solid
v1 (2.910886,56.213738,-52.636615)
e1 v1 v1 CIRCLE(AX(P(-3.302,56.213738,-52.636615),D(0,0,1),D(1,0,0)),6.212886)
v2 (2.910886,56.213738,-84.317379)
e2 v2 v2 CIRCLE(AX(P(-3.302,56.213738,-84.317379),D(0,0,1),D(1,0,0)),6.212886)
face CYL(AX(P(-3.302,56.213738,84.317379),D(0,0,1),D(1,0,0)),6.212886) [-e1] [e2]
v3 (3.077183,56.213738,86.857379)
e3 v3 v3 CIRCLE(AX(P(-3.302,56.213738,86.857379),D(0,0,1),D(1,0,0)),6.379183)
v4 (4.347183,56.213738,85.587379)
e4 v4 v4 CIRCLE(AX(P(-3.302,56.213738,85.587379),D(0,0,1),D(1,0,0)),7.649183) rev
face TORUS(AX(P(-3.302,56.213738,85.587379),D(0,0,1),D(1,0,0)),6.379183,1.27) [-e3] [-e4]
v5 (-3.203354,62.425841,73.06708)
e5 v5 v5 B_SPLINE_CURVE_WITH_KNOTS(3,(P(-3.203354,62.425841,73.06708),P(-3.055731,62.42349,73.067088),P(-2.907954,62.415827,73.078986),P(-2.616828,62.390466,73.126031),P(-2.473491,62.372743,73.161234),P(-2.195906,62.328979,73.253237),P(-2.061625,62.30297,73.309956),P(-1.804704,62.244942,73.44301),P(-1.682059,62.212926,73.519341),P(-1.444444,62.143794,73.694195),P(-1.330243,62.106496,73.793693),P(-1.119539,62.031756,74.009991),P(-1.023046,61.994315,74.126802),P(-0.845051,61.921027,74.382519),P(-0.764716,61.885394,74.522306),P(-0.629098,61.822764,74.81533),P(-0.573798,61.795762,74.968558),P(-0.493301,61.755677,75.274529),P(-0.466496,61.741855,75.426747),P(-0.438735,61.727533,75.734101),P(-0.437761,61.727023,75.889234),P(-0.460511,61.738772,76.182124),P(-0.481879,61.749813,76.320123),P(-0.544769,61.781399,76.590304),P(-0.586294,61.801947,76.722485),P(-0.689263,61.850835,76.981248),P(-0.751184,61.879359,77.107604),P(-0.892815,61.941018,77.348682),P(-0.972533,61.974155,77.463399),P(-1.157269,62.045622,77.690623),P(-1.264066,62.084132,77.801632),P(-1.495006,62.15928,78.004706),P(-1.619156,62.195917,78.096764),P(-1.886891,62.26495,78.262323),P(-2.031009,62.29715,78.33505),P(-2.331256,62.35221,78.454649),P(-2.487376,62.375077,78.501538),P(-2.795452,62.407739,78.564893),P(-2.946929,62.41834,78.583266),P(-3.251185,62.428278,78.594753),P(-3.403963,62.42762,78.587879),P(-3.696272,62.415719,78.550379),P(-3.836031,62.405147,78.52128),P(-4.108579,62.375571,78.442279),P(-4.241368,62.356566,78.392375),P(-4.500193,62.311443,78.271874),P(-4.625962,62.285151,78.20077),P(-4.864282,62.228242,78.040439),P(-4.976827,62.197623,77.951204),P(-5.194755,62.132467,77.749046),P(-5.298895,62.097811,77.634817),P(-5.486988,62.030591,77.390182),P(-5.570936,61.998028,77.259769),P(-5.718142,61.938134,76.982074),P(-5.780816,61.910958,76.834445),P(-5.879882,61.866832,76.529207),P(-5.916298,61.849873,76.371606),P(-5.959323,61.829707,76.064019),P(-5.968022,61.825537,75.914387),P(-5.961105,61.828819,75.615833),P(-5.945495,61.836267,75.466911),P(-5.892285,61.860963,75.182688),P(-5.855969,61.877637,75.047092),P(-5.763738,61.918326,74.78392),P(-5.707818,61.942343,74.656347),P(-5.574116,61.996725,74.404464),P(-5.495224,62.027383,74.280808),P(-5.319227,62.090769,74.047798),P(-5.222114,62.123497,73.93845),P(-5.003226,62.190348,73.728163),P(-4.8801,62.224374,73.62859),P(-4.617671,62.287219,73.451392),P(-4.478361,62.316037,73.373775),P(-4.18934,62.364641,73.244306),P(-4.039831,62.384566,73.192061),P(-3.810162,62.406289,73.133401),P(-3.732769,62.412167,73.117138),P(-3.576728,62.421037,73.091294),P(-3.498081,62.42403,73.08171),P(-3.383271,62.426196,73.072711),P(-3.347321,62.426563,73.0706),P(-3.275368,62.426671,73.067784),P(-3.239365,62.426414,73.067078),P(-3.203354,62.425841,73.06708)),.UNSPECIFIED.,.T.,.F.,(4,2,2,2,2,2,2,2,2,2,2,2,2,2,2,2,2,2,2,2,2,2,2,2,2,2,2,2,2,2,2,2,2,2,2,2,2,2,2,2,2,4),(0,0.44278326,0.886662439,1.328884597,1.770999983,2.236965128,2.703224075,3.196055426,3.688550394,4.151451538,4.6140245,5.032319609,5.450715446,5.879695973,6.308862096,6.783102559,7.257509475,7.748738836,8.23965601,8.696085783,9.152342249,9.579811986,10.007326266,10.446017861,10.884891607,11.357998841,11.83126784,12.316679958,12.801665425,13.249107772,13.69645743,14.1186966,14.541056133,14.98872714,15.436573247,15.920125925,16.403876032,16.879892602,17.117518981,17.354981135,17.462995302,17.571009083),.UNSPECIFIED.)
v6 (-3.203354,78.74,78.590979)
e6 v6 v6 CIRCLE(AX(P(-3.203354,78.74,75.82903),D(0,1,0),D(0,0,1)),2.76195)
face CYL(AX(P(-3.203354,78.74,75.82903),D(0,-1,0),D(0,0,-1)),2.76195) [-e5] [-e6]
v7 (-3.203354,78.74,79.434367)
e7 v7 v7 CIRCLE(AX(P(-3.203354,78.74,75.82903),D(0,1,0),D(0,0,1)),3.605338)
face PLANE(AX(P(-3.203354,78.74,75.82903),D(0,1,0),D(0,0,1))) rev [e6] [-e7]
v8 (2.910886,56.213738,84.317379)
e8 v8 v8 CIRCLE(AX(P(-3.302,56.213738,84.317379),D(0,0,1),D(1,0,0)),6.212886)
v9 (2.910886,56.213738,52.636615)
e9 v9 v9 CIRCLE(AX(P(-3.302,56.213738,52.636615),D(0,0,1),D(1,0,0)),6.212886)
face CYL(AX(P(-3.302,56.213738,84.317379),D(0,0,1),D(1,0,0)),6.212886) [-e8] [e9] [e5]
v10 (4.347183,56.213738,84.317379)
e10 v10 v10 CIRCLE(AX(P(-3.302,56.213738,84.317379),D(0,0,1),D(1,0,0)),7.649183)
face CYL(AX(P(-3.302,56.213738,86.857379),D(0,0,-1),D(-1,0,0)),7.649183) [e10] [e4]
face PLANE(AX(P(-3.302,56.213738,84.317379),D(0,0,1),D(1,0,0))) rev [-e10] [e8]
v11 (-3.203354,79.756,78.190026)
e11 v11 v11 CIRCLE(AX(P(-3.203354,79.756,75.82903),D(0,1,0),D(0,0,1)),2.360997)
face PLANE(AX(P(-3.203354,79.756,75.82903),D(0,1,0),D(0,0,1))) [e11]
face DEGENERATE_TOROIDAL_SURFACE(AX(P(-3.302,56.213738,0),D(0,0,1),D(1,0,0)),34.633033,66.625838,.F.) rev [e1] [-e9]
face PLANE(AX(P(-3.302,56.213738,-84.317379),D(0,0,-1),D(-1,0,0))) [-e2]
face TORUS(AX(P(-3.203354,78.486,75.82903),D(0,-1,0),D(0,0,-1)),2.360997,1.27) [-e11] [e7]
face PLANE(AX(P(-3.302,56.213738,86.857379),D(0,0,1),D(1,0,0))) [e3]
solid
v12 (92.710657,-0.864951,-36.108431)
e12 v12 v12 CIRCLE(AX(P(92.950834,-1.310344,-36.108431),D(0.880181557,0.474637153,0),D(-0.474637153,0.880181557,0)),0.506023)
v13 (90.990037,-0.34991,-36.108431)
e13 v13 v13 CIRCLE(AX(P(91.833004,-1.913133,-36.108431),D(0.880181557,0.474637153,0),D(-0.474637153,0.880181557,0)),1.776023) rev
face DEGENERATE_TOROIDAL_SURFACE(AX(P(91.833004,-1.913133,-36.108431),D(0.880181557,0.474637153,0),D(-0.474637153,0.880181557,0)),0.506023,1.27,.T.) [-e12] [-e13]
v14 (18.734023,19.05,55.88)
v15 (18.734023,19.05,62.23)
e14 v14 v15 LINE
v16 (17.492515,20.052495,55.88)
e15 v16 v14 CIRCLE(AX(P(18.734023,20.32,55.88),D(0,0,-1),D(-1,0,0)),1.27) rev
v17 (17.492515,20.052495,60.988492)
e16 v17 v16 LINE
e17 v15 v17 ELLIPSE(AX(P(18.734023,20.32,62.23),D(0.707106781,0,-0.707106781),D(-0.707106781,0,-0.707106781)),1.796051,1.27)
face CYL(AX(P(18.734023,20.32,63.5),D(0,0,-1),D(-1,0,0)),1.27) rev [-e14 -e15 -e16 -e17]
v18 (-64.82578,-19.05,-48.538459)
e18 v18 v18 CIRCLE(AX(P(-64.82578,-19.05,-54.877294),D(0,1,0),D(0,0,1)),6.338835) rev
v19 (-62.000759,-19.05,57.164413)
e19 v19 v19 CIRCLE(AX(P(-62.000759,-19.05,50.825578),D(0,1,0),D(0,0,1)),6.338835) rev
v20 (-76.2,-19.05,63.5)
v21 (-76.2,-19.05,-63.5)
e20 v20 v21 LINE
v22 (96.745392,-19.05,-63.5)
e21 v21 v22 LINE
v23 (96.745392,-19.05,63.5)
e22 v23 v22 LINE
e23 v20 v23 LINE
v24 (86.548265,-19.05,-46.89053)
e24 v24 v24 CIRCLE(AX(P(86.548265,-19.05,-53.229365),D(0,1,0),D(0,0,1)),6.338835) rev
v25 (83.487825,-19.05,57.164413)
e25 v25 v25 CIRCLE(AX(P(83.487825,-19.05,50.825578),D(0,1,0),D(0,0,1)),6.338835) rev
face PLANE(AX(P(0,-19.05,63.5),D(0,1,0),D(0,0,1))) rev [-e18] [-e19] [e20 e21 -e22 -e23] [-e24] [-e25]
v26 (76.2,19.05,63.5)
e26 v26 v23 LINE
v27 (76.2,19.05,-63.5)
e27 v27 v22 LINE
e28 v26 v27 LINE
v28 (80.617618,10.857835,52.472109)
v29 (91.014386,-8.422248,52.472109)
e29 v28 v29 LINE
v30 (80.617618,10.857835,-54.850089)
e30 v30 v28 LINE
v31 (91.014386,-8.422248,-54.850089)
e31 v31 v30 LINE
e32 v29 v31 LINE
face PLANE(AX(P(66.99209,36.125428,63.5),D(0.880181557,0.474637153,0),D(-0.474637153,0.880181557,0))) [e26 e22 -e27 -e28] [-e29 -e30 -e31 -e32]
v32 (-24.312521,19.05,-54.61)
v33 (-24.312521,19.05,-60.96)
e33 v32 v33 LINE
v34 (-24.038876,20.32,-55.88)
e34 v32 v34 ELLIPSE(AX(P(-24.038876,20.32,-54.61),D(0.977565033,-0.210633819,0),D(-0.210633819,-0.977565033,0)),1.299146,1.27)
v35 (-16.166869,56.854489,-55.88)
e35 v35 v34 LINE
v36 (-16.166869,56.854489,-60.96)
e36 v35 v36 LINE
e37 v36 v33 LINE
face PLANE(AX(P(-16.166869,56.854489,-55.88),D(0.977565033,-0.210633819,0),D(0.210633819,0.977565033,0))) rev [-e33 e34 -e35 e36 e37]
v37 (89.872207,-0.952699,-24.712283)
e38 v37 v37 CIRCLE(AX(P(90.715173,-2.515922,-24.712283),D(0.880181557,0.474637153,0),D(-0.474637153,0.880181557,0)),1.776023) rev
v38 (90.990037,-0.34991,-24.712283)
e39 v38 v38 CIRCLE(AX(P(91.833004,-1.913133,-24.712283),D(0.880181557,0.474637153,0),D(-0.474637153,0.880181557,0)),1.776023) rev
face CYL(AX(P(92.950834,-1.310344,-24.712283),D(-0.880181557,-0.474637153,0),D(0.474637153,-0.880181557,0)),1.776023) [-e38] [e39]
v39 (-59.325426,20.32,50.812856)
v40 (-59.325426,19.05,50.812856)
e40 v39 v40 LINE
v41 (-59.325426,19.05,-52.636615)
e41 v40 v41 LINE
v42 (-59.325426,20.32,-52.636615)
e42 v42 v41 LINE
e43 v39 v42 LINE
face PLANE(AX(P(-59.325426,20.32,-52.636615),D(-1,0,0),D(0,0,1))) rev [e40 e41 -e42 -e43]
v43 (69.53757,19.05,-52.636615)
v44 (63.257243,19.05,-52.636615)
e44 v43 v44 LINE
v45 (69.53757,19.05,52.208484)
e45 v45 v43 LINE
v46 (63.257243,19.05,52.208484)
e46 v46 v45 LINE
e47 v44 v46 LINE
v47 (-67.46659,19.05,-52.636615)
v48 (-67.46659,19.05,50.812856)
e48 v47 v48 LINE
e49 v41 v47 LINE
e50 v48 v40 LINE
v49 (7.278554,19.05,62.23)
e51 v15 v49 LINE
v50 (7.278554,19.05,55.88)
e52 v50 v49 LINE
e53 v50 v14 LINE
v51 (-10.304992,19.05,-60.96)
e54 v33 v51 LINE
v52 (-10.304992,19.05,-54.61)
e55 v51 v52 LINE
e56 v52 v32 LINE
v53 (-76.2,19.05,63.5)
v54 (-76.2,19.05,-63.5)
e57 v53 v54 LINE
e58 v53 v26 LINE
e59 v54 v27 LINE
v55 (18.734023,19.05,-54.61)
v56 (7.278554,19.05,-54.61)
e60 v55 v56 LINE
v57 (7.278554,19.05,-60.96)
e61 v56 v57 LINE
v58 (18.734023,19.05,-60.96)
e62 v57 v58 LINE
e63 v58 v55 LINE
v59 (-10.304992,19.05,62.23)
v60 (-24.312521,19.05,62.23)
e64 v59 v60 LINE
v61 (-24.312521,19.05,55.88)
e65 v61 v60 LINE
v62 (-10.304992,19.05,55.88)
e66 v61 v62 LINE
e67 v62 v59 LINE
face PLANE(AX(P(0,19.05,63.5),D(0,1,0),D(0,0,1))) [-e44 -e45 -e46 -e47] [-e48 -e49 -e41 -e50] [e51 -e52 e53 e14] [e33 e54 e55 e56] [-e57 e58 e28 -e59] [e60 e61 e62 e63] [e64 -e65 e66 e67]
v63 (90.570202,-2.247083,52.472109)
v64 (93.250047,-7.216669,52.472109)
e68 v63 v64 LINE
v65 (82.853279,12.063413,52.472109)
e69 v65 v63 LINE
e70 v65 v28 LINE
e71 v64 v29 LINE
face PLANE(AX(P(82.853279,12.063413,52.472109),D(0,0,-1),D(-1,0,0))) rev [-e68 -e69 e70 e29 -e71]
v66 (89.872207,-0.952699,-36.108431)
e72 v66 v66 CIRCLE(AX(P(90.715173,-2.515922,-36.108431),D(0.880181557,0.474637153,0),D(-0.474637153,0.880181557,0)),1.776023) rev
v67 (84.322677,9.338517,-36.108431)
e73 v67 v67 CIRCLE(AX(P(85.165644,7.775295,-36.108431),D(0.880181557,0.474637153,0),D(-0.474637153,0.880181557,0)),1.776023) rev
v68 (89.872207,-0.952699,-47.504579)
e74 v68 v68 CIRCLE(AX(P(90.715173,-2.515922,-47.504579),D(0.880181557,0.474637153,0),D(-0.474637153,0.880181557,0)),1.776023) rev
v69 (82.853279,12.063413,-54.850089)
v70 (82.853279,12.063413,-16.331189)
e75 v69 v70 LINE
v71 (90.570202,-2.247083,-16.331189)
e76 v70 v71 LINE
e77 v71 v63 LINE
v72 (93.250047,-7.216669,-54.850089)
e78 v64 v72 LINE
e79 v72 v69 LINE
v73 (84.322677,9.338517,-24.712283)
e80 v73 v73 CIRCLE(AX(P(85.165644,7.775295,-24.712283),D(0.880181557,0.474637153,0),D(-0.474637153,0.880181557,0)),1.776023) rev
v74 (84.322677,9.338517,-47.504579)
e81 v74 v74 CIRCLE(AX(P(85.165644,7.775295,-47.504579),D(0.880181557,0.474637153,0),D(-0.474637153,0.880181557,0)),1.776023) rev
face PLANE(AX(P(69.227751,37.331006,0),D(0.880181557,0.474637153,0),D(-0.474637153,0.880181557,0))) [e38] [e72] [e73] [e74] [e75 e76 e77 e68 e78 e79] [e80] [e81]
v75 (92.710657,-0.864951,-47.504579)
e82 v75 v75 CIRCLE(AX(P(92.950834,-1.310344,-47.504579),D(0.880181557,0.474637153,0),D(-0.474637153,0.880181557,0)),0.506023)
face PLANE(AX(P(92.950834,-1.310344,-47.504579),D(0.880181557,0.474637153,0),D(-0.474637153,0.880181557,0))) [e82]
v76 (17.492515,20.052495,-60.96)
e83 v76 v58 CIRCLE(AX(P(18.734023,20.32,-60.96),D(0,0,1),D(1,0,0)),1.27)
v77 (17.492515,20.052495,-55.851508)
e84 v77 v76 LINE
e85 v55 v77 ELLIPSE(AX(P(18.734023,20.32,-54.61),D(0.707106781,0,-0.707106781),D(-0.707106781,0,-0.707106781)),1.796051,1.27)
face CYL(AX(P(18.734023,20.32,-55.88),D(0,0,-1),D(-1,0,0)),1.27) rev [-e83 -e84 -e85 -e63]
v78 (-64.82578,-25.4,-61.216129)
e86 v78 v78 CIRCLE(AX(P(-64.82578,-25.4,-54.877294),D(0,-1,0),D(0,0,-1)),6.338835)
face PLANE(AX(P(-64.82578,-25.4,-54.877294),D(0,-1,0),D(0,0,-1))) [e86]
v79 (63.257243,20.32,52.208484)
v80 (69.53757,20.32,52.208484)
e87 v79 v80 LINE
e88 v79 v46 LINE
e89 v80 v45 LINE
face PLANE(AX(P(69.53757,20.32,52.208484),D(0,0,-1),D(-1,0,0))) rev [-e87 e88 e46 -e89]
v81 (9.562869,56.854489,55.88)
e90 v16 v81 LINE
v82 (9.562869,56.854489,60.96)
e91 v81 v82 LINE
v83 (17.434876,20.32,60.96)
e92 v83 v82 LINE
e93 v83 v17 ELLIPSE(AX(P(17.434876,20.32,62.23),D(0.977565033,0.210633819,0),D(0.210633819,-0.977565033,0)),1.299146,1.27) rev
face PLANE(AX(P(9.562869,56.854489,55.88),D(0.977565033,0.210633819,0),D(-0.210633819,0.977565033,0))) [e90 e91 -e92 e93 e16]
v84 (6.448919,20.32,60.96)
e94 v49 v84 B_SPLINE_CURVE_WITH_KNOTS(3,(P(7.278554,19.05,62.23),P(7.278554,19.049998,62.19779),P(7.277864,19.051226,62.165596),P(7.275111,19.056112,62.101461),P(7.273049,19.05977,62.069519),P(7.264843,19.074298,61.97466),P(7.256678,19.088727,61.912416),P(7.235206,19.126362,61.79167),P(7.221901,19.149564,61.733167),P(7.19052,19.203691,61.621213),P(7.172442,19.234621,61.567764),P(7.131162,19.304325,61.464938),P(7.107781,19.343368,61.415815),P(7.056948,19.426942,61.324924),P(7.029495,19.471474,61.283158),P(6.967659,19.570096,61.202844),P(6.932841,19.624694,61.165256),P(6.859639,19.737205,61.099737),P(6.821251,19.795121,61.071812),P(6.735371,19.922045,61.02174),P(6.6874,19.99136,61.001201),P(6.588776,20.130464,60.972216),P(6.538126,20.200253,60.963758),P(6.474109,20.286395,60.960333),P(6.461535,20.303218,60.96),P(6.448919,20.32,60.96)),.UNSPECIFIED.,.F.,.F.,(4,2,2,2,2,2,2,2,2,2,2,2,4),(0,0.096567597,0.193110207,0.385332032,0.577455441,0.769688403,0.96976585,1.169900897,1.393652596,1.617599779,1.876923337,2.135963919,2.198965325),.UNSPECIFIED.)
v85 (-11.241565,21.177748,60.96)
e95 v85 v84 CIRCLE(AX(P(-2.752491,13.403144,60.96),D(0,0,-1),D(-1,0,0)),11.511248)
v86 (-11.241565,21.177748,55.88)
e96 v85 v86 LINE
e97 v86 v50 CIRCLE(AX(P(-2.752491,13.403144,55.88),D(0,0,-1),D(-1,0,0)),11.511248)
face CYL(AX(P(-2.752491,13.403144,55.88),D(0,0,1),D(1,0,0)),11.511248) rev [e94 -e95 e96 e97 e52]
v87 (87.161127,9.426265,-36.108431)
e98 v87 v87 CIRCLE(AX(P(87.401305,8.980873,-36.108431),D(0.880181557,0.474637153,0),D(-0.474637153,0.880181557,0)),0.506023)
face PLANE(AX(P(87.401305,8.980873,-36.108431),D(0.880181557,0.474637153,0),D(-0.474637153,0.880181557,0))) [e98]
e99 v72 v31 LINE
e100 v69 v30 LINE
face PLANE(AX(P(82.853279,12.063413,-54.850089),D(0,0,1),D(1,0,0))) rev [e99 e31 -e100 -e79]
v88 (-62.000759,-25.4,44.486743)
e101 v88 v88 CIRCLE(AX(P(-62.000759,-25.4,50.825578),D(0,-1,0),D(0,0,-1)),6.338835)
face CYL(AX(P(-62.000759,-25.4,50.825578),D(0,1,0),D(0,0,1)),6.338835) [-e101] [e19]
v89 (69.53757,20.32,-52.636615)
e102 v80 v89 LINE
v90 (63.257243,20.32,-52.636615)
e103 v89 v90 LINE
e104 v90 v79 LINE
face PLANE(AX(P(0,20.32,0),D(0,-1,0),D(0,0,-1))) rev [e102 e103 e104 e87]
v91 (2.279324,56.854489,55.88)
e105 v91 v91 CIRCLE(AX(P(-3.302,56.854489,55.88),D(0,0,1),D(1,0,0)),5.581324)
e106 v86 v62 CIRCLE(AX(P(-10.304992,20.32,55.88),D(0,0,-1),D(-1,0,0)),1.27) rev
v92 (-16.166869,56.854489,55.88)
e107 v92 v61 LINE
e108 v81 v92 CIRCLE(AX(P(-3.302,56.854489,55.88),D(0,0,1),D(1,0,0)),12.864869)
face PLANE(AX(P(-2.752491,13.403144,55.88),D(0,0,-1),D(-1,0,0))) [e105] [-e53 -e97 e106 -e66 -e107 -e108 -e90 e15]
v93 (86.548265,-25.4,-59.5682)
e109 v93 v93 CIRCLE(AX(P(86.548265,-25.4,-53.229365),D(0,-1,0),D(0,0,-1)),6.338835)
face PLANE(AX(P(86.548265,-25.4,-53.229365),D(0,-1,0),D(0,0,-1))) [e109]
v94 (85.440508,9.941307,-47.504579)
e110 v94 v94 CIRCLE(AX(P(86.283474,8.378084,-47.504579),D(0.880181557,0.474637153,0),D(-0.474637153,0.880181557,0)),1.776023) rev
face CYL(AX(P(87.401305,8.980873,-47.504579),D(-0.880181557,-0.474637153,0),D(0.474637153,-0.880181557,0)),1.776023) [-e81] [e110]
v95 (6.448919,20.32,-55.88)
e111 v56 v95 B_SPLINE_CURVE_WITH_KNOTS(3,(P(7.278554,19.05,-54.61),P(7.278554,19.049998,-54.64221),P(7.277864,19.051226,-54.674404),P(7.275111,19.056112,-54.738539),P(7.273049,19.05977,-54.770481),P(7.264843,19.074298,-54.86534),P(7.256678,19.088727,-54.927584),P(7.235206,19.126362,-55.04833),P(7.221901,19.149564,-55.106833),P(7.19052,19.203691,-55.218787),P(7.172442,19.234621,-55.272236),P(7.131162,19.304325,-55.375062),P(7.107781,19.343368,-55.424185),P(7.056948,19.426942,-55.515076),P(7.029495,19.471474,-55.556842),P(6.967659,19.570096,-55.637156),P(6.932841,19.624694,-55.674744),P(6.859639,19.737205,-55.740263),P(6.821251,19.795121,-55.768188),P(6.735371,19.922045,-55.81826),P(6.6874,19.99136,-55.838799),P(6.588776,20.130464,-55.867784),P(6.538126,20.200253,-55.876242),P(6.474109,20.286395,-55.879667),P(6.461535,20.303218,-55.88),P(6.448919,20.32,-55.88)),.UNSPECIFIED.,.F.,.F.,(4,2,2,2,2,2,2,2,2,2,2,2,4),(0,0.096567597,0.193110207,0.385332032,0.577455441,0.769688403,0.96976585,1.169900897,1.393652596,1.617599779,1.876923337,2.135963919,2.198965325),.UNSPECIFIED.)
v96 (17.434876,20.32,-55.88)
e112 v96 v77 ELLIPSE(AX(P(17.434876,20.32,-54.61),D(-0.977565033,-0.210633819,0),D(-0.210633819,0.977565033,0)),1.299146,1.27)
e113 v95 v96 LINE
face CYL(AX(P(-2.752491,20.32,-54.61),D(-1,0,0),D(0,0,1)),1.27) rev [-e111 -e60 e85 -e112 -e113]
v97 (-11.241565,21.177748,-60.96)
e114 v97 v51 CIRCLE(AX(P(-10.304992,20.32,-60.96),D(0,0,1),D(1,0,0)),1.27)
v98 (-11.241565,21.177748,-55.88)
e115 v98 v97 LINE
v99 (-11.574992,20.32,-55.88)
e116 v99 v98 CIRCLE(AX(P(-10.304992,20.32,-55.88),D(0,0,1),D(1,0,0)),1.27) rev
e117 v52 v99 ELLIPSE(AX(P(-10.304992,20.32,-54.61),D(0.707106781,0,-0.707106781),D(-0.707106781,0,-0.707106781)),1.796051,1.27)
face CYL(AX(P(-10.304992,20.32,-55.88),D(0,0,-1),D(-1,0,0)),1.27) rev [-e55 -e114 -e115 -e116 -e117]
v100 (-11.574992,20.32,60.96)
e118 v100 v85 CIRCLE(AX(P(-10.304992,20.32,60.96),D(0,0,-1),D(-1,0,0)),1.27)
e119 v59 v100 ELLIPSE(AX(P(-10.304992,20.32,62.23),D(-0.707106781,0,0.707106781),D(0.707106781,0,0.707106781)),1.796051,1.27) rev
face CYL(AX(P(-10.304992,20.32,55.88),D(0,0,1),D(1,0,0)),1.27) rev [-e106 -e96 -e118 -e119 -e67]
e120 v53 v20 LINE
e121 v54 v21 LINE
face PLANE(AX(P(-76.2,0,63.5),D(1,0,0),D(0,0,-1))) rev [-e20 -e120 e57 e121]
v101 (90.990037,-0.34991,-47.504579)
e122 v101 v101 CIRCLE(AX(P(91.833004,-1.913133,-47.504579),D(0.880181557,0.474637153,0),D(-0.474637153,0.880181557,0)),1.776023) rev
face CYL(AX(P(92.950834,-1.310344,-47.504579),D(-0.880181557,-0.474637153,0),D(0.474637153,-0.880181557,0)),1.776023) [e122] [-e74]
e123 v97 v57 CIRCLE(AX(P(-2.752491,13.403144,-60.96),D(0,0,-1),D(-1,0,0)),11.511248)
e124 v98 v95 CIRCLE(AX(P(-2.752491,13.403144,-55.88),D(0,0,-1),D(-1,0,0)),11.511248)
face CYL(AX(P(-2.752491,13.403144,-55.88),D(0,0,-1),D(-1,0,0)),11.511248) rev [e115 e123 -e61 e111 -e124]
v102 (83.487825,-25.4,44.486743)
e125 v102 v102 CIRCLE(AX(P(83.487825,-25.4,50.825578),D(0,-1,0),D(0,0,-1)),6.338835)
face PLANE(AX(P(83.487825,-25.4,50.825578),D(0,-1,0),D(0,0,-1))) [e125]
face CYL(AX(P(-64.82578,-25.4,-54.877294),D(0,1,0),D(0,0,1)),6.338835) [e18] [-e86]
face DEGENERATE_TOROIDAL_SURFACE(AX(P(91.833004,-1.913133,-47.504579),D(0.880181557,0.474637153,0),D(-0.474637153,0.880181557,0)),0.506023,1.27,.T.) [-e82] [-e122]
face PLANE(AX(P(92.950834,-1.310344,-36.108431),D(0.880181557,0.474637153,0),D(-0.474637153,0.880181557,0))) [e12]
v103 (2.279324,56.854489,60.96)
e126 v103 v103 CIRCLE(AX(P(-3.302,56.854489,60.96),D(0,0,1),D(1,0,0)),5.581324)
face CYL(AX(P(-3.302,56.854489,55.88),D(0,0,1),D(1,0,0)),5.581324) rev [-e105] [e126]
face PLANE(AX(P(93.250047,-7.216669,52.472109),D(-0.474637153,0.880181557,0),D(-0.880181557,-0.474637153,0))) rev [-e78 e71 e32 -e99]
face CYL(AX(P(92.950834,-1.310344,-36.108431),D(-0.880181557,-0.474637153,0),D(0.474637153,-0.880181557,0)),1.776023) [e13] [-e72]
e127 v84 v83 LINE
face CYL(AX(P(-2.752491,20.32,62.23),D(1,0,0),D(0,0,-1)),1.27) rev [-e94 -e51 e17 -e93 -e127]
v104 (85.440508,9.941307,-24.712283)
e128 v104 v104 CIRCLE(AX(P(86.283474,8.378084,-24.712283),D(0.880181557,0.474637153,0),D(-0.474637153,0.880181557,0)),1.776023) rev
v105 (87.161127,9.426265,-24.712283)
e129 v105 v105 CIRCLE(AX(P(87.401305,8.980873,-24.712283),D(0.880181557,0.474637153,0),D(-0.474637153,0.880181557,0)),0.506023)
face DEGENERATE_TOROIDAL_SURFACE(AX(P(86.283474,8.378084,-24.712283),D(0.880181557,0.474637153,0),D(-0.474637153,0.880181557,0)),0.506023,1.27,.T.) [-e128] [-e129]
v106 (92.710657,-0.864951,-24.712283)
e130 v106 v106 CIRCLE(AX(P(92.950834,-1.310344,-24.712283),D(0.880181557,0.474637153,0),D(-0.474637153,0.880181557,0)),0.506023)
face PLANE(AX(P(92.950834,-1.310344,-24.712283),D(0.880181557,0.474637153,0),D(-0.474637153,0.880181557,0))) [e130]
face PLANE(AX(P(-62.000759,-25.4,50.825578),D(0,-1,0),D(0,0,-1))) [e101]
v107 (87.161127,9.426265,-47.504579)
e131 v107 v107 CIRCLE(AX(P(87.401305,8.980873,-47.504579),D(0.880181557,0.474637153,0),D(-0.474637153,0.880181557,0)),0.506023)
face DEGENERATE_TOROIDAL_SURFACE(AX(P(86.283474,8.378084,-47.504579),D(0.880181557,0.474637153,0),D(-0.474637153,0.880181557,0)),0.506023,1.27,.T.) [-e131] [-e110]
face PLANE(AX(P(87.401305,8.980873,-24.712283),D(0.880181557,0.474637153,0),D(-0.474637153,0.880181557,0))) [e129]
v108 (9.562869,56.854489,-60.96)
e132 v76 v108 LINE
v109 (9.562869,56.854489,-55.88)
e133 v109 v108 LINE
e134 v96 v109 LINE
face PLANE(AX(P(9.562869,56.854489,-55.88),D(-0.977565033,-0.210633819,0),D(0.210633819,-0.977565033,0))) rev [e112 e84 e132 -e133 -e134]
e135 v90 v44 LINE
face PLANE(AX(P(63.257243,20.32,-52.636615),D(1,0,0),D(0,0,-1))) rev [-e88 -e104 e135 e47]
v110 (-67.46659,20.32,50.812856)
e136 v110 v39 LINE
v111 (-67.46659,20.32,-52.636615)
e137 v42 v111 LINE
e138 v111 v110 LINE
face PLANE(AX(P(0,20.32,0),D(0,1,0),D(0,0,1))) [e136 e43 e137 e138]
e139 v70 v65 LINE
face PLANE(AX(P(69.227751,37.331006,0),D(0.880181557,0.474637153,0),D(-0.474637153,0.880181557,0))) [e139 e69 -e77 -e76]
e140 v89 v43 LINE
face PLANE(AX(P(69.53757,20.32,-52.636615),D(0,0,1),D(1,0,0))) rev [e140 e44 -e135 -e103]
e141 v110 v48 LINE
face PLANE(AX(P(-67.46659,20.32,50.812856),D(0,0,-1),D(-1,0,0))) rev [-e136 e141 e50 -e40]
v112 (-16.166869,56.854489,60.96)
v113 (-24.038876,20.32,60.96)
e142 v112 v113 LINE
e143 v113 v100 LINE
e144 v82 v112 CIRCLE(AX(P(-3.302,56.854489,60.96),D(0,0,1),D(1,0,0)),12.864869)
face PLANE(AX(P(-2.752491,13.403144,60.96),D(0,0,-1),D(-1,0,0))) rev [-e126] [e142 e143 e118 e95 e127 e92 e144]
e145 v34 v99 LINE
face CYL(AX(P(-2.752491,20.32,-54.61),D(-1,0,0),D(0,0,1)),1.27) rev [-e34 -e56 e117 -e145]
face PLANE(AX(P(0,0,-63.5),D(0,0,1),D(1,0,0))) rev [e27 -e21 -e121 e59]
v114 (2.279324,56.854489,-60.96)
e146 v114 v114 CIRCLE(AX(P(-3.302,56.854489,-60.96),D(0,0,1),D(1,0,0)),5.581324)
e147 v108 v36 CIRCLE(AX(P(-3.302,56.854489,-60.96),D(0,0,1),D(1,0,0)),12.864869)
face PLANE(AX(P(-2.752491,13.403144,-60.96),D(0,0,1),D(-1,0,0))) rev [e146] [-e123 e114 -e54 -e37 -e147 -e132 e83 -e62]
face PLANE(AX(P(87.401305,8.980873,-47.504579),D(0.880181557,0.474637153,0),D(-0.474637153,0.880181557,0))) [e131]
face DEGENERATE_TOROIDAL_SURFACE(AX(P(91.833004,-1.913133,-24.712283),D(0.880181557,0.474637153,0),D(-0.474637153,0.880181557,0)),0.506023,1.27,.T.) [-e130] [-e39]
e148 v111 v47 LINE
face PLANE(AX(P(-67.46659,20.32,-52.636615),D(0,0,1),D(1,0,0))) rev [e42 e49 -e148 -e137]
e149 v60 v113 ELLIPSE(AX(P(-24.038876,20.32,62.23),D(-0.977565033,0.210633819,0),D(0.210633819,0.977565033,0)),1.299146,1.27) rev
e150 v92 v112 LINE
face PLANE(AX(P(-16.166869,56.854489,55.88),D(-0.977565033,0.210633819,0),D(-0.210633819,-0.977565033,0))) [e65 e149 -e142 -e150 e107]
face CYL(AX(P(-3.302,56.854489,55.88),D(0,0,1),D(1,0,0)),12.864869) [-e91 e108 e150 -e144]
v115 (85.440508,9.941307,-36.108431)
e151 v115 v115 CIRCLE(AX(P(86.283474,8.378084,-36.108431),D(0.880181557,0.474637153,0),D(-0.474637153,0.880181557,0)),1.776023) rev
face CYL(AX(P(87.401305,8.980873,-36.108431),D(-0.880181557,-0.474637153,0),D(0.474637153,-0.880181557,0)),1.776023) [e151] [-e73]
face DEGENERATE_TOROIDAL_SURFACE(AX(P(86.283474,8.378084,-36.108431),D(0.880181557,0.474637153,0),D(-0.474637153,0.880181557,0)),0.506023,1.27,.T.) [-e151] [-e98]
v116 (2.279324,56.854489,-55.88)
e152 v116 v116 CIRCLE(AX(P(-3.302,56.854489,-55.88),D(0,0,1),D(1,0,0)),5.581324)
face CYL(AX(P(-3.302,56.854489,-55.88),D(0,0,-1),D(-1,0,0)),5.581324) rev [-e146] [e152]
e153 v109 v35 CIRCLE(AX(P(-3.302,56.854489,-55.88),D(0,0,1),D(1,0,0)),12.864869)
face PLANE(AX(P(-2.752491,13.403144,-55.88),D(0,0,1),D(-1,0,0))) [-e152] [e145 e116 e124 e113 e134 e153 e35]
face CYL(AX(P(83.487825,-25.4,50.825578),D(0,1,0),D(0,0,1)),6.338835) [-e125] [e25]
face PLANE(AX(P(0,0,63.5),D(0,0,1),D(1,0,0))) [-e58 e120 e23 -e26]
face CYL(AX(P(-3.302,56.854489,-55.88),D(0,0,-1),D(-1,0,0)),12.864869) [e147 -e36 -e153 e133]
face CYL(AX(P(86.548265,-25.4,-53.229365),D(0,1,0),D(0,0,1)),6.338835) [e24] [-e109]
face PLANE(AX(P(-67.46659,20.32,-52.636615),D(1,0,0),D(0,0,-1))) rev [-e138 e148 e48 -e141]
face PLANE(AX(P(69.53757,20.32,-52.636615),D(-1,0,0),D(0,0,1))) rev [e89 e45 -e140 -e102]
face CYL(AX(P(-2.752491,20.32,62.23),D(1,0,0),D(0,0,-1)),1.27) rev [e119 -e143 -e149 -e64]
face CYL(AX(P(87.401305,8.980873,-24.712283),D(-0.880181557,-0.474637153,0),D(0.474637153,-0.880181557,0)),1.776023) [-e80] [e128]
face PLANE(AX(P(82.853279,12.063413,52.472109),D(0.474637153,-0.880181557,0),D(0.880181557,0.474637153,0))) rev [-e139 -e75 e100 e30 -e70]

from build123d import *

# Parameters (mm, degrees)
SKETCH1_W           = 152.4
SKETCH1_H           = 38.1
BOSS_EXTRUDE1_DEPTH = 63.5
BOSS_EXTRUDE2_START = -2.54
SKETCH2_R           = 5.581324081
BOSS_EXTRUDE2_DEPTH = 5.08
SKETCH5_R           = 7.649182697
BOSS_EXTRUDE3_DEPTH = 2.54
SKETCH6_W           = 6.28032652
SKETCH6_H           = 104.845098628
SKETCH6_W_2         = 8.141164008
SKETCH6_H_2         = 103.449470512
BOSS_EXTRUDE4_DEPTH = 1.27
SKETCH10_R          = 6.338835005
BOSS_EXTRUDE5_DEPTH = 6.35
SKETCH11_W          = 107.32219814
SKETCH11_H          = 21.904665517
BOSS_EXTRUDE6_DEPTH = 2.54
SKETCH14_R          = 1.776023081
BOSS_EXTRUDE7_DEPTH = 5.08
FILLET2_R           = 1.27
BOSS_EXTRUDE8_START = 55.88
SKETCH15_R          = 2.761949727
BOSS_EXTRUDE8_DEPTH = 22.86
SKETCH16_R          = 3.605337553
BOSS_EXTRUDE9_DEPTH = 1.016
FILLET3_R           = 1.27
FILLET4_R           = 1.27
FILLET5_R           = 1.27


with BuildPart() as part:
    # Sketch1 → Boss-Extrude1 (new, symmetric)
    with BuildSketch(Plane.XY):
        Rectangle(SKETCH1_W, SKETCH1_H)
        Polygon((96.745392491, -19.05), (76.2, -19.05), (76.2, 19.05), align=None)
    extrude(amount=BOSS_EXTRUDE1_DEPTH, both=True)

    # Sketch2 → Boss-Extrude2 (add)
    with BuildSketch(Plane.XY.offset(63.5).offset(BOSS_EXTRUDE2_START)):
        with BuildLine():
            Line((-16.166869298, 19.05), (-12.783535661, 19.05))
            ThreePointArc((-12.783535661, 19.05), (-2.752490883, 24.914392577), (7.278553894, 19.05))
            Line((7.278553894, 19.05), (9.562869298, 19.05))
            Line((9.562869298, 19.05), (17.708520628, 19.05))
            Line((17.708520628, 19.05), (9.562869298, 56.854489091))
            ThreePointArc((9.562869298, 56.854489091), (-3.302, 69.719358389), (-16.166869298, 56.854489091))
            Line((-16.166869298, 56.854489091), (-24.312520628, 19.05))
            Line((-24.312520628, 19.05), (-16.166869298, 19.05))
        make_face()
        with Locations((-3.302, 56.854489091)):
            Circle(SKETCH2_R, mode=Mode.SUBTRACT)
    boss_extrude2 = extrude(amount=-BOSS_EXTRUDE2_DEPTH)

    # Mirror1: Boss-Extrude2 across plane
    add(boss_extrude2.mirror(Plane.XY))

    # Sketch6 → Boss-Extrude4 (add)
    with BuildSketch(Plane(origin=(0, 19.05, 0), x_dir=(1, 0, 0), z_dir=(0, 1, 0))):
        with Locations((66.397406276, 0.214065446)):
            Rectangle(SKETCH6_W, SKETCH6_H)
        with Locations((-63.396008473, 0.911879504)):
            Rectangle(SKETCH6_W_2, SKETCH6_H_2)
    extrude(amount=BOSS_EXTRUDE4_DEPTH)

    # Sketch10 → Boss-Extrude5 (add)
    with BuildSketch(Plane.XZ.offset(19.05)):
        with Locations(Location((-62.000759301, 50.825577826, 0), (0, 0, 90))):
            Circle(SKETCH10_R)
        with Locations(Location((83.487825481, 50.825577826, 0), (0, 0, 90))):
            Circle(SKETCH10_R)
        with Locations(Location((86.548264966, -53.229364688, 0), (0, 0, 90))):
            Circle(SKETCH10_R)
        with Locations(Location((-64.825780365, -54.877293642, 0), (0, 0, 90))):
            Circle(SKETCH10_R)
    extrude(amount=BOSS_EXTRUDE5_DEPTH)

    # Sketch11 → Boss-Extrude6 (add)
    with BuildSketch(Plane(origin=(66.992090278, 36.125427522, 0), x_dir=(0, 0, -1), z_dir=(0.8801815566196112, 0.47463715339897106, 0))):
        with Locations((1.188989576, -39.659583599)):
            Rectangle(SKETCH11_W, SKETCH11_H)
    extrude(amount=BOSS_EXTRUDE6_DEPTH)

    # Sketch14 → Boss-Extrude7 (add)
    with BuildSketch(Plane(origin=(66.992090278, 36.125427522, 0), x_dir=(0, 0, -1), z_dir=(0.8801815566196111, 0.474637153398971, 0))):
        with Locations(Location((24.712283214, -33.579107671, 0), (0, 0, 90))):
            Circle(SKETCH14_R)
        with Locations(Location((36.108431317, -33.579107671, 0), (0, 0, 90))):
            Circle(SKETCH14_R)
        with Locations(Location((47.50457942, -33.579107671, 0), (0, 0, 90))):
            Circle(SKETCH14_R)
        with Locations(Location((24.712283214, -45.271259621, 0), (0, 0, 90))):
            Circle(SKETCH14_R)
        with Locations(Location((36.108431317, -45.271259621, 0), (0, 0, 90))):
            Circle(SKETCH14_R)
        with Locations(Location((47.50457942, -45.271259621, 0), (0, 0, 90))):
            Circle(SKETCH14_R)
    extrude(amount=BOSS_EXTRUDE7_DEPTH)

    # Fillet2
    fillet2_edges = [part.edges().sort_by_distance(p)[0] for p in [
        (88.244271204, 7.417650241, -24.712283214),
        (88.244271204, 7.417650241, -36.108431317),
        (88.244271204, 7.417650241, -47.50457942),
        (93.793800923, -2.873566262, -24.712283214),
        (93.793800923, -2.873566262, -36.108431317),
        (93.793800923, -2.873566262, -47.50457942),
    ]]
    fillet(fillet2_edges, radius=FILLET2_R)

    # Fillet5
    fillet5_edges = [part.edges().sort_by_distance(p)[0] for p in [
        (17.708520628, 19.05, 58.42),
        (-12.783535661, 19.05, 58.42),
        (-18.548028145, 19.05, 60.96),
        (12.493537261, 19.05, 60.96),
        (-18.548028145, 19.05, -55.88),
        (12.493537261, 19.05, -55.88),
        (-12.783535661, 19.05, -58.42),
        (17.708520628, 19.05, -58.42),
    ]]
    fillet(fillet5_edges, radius=FILLET5_R)


with BuildPart() as body_2:
    # Sketch4 → Revolve2 (revolve)
    with BuildSketch(Plane(origin=(-3.302, 0, 0), x_dir=(0, 0, -1), z_dir=(1, 0, 0)), mode=Mode.PRIVATE) as revolve2_sk:
        with BuildLine():
            Line((-84.317378873, 56.213738137), (-84.317378873, 50.000852268))
            Line((-84.317378873, 50.000852268), (-52.63661476, 50.000852268))
            ThreePointArc((-52.63661476, 50.000852268), (0, 24.220932902), (52.63661476, 50.000852268))
            Line((52.63661476, 50.000852268), (84.317378873, 50.000852268))
            Line((84.317378873, 50.000852268), (84.317378873, 56.213738137))
            Line((84.317378873, 56.213738137), (-84.317378873, 56.213738137))
        make_face()
    revolve(revolve2_sk.sketch.rotate(Axis((-3.302, 56.213738137, 84.317378873), (0, 0, -1)), 270), axis=Axis((-3.302, 56.213738137, 84.317378873), (0, 0, -1)))

    # Sketch5 → Boss-Extrude3 (add)
    with BuildSketch(Plane.XY.offset(84.317378873)):
        with Locations((-3.302, 56.213738137)):
            Circle(SKETCH5_R)
    extrude(amount=BOSS_EXTRUDE3_DEPTH)

    # Sketch15 → Boss-Extrude8 (add)
    with BuildSketch(Plane(origin=(0, 0, 0), x_dir=(1, 0, 0), z_dir=(0, 1, 0)).offset(BOSS_EXTRUDE8_START)):
        with Locations(Location((-3.203353786, -75.829029675, 0), (0, 0, 90))):
            Circle(SKETCH15_R)
    extrude(amount=BOSS_EXTRUDE8_DEPTH)

    # Sketch16 → Boss-Extrude9 (add)
    with BuildSketch(Plane(origin=(0, 78.74, 0), x_dir=(1, 0, 0), z_dir=(0, 1, 0))):
        with Locations(Location((-3.203353786, -75.829029675, 0), (0, 0, 270))):
            Circle(SKETCH16_R)
    extrude(amount=BOSS_EXTRUDE9_DEPTH)

    # Fillet3
    fillet3_edges = [body_2.edges().sort_by_distance(p)[0] for p in [
        (-10.951182697, 56.213738137, 86.857378873),
    ]]
    fillet(fillet3_edges, radius=FILLET3_R)

    # Fillet4
    # the kernel refuses this fillet: 1.27 mm, written as the material it takes off along each edge
    with BuildSketch(Plane(origin=(-3.203353786, 79.756, 75.829029675), x_dir=(0, 0, 1), z_dir=(-1, 0, 0))) as fillet4_piece_1:
        with BuildLine():
            CenterArc((2.360996764, -1.27), FILLET4_R, 11.536959033, 78.463040967)
            Line((2.360996764, 0), (2.360996764, 0.0254))
            Line((2.360996764, 0.0254), (3.605337553, 0.0254))
            Line((3.605337553, 0.0254), (3.630737553, 0))
            ThreePointArc((3.630737553, 0), (3.630737553, -0.508), (3.630224369, -1.01092))
            Line((3.630224369, -1.01092), (3.605337553, -1.016))
        make_face()
    revolve(axis=Axis((-3.203353786, 79.756, 75.829029675), (0, 1, 0)), mode=Mode.SUBTRACT)


solid = Compound([part.part, body_2.part])
